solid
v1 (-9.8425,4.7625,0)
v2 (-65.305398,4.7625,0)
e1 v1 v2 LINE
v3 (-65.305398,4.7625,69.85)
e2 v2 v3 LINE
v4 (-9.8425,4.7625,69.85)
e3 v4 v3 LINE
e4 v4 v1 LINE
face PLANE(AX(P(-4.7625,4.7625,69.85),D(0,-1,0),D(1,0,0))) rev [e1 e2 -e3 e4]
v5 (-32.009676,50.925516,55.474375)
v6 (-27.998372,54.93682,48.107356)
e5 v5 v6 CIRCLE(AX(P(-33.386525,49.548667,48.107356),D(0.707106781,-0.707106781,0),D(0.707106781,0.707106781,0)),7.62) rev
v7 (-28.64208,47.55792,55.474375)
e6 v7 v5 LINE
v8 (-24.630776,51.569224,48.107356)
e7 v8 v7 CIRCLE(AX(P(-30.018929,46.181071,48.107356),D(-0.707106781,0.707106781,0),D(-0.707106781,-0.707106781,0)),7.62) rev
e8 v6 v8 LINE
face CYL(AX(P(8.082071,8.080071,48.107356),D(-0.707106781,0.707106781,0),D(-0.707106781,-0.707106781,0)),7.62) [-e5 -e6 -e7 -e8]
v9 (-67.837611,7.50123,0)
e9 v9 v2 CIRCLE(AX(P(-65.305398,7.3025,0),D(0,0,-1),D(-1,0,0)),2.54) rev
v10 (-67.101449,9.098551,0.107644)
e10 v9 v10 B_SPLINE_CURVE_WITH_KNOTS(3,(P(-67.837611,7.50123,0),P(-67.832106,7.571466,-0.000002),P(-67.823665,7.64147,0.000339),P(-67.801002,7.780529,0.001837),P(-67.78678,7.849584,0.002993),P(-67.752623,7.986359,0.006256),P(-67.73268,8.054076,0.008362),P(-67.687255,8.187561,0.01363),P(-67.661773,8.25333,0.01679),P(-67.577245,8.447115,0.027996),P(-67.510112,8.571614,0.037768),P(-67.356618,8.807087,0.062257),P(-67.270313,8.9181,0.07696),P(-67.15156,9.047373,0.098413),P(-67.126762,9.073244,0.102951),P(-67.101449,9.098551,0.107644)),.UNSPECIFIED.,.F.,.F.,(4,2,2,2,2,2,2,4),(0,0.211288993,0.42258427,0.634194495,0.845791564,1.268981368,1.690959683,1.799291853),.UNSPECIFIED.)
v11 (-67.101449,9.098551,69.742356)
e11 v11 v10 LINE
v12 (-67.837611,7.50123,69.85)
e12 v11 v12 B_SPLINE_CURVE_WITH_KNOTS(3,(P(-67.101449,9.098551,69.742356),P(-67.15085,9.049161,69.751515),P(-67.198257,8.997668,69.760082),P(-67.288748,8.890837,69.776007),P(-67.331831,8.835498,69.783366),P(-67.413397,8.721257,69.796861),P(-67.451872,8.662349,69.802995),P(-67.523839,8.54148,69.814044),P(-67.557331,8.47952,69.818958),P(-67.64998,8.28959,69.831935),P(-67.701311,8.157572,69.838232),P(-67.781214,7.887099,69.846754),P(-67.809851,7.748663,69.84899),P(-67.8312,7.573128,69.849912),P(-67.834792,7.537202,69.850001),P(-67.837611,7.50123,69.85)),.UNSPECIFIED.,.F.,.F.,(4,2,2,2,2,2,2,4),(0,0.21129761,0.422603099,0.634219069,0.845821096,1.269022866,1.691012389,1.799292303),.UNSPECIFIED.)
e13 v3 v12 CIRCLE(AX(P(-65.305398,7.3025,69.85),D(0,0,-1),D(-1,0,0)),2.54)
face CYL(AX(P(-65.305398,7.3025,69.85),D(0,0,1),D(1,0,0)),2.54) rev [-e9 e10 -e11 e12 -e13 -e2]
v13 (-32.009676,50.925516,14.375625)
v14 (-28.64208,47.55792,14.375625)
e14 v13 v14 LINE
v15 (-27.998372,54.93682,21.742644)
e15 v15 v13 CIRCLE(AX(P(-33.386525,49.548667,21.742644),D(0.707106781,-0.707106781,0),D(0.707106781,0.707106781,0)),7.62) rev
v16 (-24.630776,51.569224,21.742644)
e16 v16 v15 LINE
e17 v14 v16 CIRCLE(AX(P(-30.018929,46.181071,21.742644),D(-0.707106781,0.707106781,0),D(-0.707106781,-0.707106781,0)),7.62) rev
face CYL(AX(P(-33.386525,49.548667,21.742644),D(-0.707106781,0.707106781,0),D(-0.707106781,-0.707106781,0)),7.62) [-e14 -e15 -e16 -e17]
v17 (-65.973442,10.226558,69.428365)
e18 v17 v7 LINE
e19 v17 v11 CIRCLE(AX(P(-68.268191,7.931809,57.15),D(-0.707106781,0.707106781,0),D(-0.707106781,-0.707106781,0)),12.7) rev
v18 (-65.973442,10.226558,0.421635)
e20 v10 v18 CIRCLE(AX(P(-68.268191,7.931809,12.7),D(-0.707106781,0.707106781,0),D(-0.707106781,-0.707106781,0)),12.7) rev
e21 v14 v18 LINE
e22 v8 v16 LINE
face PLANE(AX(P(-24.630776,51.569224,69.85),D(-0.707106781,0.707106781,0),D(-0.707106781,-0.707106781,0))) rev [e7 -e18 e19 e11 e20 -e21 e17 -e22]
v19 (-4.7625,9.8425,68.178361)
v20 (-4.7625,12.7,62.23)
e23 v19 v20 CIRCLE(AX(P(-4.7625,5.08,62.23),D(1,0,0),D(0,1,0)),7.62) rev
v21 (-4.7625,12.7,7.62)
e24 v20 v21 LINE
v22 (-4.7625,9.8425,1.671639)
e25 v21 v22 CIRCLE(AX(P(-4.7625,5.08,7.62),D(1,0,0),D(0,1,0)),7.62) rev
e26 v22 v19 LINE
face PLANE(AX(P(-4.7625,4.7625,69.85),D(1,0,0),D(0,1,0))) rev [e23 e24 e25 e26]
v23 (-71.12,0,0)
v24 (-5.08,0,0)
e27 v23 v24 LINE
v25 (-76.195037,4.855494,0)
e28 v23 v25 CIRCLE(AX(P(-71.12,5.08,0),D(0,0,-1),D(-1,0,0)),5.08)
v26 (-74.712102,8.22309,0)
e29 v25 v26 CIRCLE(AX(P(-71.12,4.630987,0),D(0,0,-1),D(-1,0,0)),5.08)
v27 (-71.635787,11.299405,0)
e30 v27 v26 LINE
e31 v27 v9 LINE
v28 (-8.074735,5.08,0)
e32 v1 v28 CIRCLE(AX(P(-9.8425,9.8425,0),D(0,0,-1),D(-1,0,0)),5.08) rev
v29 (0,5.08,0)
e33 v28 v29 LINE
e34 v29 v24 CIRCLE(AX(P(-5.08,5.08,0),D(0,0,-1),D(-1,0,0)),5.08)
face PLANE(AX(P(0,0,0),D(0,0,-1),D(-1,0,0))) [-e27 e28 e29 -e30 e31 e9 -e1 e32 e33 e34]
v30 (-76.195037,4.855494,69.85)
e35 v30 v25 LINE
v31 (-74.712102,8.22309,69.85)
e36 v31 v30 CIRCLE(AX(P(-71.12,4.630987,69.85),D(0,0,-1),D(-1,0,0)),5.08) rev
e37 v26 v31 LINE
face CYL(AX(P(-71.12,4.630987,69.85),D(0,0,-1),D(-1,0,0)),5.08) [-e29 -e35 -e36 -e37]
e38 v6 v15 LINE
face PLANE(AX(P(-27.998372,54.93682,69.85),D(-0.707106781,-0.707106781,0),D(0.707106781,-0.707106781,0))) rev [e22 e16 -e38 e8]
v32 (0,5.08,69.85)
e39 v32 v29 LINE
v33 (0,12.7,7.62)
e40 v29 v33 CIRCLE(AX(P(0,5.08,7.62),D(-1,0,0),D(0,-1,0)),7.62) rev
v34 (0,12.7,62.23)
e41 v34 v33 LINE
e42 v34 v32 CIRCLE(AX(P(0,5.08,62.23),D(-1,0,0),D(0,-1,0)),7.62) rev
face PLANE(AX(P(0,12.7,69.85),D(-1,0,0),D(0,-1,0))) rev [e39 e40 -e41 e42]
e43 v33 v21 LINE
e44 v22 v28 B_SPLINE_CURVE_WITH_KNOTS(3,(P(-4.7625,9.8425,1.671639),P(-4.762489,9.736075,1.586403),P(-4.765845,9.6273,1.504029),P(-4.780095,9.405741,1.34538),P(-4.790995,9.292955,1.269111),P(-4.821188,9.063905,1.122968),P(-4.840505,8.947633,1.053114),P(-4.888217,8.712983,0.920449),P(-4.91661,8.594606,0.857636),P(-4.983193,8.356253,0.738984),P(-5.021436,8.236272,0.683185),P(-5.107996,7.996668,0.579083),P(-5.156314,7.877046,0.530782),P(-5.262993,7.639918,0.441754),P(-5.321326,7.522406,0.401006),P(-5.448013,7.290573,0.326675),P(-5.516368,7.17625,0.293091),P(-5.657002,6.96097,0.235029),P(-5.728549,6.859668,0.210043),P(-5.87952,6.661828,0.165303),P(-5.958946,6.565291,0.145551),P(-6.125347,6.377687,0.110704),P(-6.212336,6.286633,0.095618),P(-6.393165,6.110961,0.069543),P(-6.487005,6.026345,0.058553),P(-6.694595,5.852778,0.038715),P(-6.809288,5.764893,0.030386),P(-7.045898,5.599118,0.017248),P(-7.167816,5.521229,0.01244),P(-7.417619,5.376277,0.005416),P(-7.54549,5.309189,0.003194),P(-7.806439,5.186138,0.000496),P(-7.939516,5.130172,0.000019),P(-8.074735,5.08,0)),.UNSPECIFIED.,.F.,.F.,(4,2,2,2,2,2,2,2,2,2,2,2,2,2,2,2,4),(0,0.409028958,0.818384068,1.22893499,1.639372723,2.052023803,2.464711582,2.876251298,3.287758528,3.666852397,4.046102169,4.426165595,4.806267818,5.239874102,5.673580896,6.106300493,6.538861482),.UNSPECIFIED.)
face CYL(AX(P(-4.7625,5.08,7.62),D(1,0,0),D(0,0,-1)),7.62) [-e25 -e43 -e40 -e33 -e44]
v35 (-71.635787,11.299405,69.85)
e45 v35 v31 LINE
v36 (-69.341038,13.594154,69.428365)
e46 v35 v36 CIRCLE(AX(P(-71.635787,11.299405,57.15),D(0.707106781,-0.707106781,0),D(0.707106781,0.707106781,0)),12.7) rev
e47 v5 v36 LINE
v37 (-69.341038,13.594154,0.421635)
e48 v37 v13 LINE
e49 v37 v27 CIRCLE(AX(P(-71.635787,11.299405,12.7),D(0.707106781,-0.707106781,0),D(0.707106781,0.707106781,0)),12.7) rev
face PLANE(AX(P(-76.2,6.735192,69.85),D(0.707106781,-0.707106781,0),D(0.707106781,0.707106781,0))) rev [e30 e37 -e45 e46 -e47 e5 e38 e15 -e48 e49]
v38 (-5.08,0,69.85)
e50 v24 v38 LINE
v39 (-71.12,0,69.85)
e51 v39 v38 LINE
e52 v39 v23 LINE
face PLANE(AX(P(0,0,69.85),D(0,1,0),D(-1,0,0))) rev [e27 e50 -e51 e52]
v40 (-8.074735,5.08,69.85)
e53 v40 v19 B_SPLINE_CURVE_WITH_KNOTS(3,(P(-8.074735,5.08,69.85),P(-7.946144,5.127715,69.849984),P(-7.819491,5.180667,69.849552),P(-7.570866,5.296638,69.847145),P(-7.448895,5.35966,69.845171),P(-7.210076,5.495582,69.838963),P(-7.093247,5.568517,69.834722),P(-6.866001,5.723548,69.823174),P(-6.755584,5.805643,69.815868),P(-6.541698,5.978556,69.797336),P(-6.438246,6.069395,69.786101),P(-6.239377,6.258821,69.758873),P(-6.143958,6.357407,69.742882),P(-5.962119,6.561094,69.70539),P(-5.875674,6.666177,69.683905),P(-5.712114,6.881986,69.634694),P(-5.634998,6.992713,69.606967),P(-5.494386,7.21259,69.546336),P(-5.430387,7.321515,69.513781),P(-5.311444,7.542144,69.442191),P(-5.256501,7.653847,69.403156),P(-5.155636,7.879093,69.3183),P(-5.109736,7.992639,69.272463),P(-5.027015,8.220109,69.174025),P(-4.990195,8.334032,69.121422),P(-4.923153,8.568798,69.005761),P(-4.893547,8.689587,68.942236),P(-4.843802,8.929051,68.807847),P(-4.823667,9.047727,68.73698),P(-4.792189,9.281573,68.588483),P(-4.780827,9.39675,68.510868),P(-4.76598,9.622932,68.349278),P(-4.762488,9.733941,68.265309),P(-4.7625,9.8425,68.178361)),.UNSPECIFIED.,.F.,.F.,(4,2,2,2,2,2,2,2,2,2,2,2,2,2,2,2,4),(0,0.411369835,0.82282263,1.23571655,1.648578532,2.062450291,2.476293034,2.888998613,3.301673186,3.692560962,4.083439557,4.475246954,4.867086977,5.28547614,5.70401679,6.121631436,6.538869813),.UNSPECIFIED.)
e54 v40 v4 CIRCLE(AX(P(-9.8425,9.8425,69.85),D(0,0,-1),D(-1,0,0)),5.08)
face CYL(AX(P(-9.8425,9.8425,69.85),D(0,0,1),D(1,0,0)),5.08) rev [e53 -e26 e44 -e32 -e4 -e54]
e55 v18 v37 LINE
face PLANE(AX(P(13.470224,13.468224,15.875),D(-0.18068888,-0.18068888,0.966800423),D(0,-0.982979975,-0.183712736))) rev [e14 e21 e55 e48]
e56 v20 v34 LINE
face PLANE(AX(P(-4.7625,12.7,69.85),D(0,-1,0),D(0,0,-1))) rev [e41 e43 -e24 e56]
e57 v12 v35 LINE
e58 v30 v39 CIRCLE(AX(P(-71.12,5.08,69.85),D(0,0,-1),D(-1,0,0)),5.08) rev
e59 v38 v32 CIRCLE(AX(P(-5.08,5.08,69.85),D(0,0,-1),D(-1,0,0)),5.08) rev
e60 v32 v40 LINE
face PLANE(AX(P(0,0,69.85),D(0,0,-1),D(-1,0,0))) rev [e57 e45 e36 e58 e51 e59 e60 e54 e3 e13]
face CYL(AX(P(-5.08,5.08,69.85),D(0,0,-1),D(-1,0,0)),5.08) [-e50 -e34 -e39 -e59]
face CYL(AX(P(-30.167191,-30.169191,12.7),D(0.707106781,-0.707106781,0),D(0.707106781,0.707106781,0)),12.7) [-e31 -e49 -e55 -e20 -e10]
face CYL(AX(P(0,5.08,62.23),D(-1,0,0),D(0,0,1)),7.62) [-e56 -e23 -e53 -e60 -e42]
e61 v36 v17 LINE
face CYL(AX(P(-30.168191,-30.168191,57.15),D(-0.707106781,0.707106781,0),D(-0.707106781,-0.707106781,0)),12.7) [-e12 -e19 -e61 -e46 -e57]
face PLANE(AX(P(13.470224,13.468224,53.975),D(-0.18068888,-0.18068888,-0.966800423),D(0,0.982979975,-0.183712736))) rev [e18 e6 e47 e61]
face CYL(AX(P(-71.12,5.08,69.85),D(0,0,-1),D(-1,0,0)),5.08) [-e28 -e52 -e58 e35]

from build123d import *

# Parameters (mm, degrees)
BOSS_EXTRUDE1_DEPTH = 69.85
FILLET1_R           = 5.08
FILLET3_R           = 2.54
CUT_EXTRUDE1_REACH  = 93.204
FILLET2_R           = 7.62
FILLET4_R           = 12.7


with BuildPart() as part:
    # Sketch1 → Boss-Extrude1 (new body)
    with BuildSketch(Plane.XY):
        Polygon((-76.2, 6.735192091), (-27.998371742, 54.936820349), (-24.630775696, 51.569224304), (-71.4375, 4.7625), (-4.7625, 4.7625), (-4.7625, 12.7), (0, 12.7), (0, 6.630240755), (0, 0), (-76.2, 0), align=None)
    extrude(amount=BOSS_EXTRUDE1_DEPTH)

    # Fillet1
    # the kernel refuses this fillet: 5.08 mm, written as the material it adds along each edge
    with BuildSketch(Plane(origin=(-4.7625, 4.7625, 0), x_dir=(0, 1, 0), z_dir=(0, 0, 1))) as fillet1_piece_1:
        with BuildLine():
            CenterArc((FILLET1_R, FILLET1_R), FILLET1_R, 180, 90)
            Line((0, FILLET1_R), (0, 0))
            Line((0, 0), (FILLET1_R, 0))
        make_face()
    extrude(amount=69.85)
    # the kernel refuses this fillet: 5.08 mm, written as the material it takes off along each edge
    with BuildSketch(Plane(origin=(-76.2, 0, -12.7), x_dir=(0, 1, 0), z_dir=(0, 0, 1)), Plane(origin=(0, 0, -12.7), x_dir=(-1, 0, 0), z_dir=(0, 0, 1))) as fillet1_2_piece_1:
        with BuildLine():
            CenterArc((FILLET1_R, -FILLET1_R), FILLET1_R, 90, 90)
            Line((0, -FILLET1_R), (0, 0))
            Line((0, 0), (FILLET1_R, 0))
        make_face()
    extrude(amount=95.25, mode=Mode.SUBTRACT)
    with BuildSketch(Plane(origin=(-76.2, 6.735192091, -5.260512242), x_dir=(0.7071067811865465, 0.7071067811865486, 0), z_dir=(0, 0, 1))) as fillet1_2_piece_2:
        with BuildLine():
            CenterArc((FILLET1_R * 0.414213562373, -FILLET1_R), FILLET1_R, 90, 45)
            Line((-FILLET1_R * 0.292893218813, -FILLET1_R * 0.292893218813), (0, 0))
            Line((0, 0), (FILLET1_R * 0.414213562373, 0))
        make_face()
    extrude(amount=80.371024484, mode=Mode.SUBTRACT)

    # Fillet3
    fillet3_edges = [part.edges().sort_by_distance(p)[0] for p in [
        (-71.4375, 4.7625, 34.925),
    ]]
    fillet(fillet3_edges, radius=FILLET3_R)

    # Sketch2 → Cut-Extrude1 (cut, up to next)
    with BuildSketch(Plane(origin=(-41.467596045, 41.467596045, 0), x_dir=(0, 0, 1), z_dir=(-0.7071067811865489, 0.7071067811865462, 0)), mode=Mode.PRIVATE) as cut_extrude1_sk1:
        Polygon((15.875, 19.048359685), (0, -41.014242187), (0, 19.048359685), align=None)
    cut_extrude1_tool1 = extrude(cut_extrude1_sk1.sketch, amount=-CUT_EXTRUDE1_REACH, mode=Mode.PRIVATE) & part.part
    # Sketch2 → Cut-Extrude1 (cut, up to next)
    with BuildSketch(Plane(origin=(-41.467596045, 41.467596045, 0), x_dir=(0, 0, 1), z_dir=(-0.7071067811865489, 0.7071067811865462, 0)), mode=Mode.PRIVATE) as cut_extrude1_sk2:
        Polygon((69.85, 19.048359685), (53.975, 19.048359685), (69.85, -41.014242187), align=None)
    cut_extrude1_tool2 = extrude(cut_extrude1_sk2.sketch, amount=-CUT_EXTRUDE1_REACH, mode=Mode.PRIVATE) & part.part
    add(cut_extrude1_tool1.solids().sort_by_distance((-42.155263, 40.779929, 5.291667))[0], mode=Mode.SUBTRACT)
    add(cut_extrude1_tool2.solids().sort_by_distance((-42.155263, 40.779929, 64.558333))[0], mode=Mode.SUBTRACT)

    # Fillet2
    fillet2_edges = [part.edges().sort_by_distance(p)[0] for p in [
        (-2.38125, 12.7, 0),
        (-2.38125, 12.7, 69.85),
        (-26.314573719, 53.253022326, 53.975),
        (-26.314573719, 53.253022326, 15.875),
    ]]
    fillet(fillet2_edges, radius=FILLET2_R)

    # Fillet4
    fillet4_edges = [part.edges().sort_by_distance(p)[0] for p in [
        (-68.785246798, 10.782349247, 0),
        (-68.785246798, 10.782349247, 69.85),
    ]]
    fillet(fillet4_edges, radius=FILLET4_R)


solid = part.part
